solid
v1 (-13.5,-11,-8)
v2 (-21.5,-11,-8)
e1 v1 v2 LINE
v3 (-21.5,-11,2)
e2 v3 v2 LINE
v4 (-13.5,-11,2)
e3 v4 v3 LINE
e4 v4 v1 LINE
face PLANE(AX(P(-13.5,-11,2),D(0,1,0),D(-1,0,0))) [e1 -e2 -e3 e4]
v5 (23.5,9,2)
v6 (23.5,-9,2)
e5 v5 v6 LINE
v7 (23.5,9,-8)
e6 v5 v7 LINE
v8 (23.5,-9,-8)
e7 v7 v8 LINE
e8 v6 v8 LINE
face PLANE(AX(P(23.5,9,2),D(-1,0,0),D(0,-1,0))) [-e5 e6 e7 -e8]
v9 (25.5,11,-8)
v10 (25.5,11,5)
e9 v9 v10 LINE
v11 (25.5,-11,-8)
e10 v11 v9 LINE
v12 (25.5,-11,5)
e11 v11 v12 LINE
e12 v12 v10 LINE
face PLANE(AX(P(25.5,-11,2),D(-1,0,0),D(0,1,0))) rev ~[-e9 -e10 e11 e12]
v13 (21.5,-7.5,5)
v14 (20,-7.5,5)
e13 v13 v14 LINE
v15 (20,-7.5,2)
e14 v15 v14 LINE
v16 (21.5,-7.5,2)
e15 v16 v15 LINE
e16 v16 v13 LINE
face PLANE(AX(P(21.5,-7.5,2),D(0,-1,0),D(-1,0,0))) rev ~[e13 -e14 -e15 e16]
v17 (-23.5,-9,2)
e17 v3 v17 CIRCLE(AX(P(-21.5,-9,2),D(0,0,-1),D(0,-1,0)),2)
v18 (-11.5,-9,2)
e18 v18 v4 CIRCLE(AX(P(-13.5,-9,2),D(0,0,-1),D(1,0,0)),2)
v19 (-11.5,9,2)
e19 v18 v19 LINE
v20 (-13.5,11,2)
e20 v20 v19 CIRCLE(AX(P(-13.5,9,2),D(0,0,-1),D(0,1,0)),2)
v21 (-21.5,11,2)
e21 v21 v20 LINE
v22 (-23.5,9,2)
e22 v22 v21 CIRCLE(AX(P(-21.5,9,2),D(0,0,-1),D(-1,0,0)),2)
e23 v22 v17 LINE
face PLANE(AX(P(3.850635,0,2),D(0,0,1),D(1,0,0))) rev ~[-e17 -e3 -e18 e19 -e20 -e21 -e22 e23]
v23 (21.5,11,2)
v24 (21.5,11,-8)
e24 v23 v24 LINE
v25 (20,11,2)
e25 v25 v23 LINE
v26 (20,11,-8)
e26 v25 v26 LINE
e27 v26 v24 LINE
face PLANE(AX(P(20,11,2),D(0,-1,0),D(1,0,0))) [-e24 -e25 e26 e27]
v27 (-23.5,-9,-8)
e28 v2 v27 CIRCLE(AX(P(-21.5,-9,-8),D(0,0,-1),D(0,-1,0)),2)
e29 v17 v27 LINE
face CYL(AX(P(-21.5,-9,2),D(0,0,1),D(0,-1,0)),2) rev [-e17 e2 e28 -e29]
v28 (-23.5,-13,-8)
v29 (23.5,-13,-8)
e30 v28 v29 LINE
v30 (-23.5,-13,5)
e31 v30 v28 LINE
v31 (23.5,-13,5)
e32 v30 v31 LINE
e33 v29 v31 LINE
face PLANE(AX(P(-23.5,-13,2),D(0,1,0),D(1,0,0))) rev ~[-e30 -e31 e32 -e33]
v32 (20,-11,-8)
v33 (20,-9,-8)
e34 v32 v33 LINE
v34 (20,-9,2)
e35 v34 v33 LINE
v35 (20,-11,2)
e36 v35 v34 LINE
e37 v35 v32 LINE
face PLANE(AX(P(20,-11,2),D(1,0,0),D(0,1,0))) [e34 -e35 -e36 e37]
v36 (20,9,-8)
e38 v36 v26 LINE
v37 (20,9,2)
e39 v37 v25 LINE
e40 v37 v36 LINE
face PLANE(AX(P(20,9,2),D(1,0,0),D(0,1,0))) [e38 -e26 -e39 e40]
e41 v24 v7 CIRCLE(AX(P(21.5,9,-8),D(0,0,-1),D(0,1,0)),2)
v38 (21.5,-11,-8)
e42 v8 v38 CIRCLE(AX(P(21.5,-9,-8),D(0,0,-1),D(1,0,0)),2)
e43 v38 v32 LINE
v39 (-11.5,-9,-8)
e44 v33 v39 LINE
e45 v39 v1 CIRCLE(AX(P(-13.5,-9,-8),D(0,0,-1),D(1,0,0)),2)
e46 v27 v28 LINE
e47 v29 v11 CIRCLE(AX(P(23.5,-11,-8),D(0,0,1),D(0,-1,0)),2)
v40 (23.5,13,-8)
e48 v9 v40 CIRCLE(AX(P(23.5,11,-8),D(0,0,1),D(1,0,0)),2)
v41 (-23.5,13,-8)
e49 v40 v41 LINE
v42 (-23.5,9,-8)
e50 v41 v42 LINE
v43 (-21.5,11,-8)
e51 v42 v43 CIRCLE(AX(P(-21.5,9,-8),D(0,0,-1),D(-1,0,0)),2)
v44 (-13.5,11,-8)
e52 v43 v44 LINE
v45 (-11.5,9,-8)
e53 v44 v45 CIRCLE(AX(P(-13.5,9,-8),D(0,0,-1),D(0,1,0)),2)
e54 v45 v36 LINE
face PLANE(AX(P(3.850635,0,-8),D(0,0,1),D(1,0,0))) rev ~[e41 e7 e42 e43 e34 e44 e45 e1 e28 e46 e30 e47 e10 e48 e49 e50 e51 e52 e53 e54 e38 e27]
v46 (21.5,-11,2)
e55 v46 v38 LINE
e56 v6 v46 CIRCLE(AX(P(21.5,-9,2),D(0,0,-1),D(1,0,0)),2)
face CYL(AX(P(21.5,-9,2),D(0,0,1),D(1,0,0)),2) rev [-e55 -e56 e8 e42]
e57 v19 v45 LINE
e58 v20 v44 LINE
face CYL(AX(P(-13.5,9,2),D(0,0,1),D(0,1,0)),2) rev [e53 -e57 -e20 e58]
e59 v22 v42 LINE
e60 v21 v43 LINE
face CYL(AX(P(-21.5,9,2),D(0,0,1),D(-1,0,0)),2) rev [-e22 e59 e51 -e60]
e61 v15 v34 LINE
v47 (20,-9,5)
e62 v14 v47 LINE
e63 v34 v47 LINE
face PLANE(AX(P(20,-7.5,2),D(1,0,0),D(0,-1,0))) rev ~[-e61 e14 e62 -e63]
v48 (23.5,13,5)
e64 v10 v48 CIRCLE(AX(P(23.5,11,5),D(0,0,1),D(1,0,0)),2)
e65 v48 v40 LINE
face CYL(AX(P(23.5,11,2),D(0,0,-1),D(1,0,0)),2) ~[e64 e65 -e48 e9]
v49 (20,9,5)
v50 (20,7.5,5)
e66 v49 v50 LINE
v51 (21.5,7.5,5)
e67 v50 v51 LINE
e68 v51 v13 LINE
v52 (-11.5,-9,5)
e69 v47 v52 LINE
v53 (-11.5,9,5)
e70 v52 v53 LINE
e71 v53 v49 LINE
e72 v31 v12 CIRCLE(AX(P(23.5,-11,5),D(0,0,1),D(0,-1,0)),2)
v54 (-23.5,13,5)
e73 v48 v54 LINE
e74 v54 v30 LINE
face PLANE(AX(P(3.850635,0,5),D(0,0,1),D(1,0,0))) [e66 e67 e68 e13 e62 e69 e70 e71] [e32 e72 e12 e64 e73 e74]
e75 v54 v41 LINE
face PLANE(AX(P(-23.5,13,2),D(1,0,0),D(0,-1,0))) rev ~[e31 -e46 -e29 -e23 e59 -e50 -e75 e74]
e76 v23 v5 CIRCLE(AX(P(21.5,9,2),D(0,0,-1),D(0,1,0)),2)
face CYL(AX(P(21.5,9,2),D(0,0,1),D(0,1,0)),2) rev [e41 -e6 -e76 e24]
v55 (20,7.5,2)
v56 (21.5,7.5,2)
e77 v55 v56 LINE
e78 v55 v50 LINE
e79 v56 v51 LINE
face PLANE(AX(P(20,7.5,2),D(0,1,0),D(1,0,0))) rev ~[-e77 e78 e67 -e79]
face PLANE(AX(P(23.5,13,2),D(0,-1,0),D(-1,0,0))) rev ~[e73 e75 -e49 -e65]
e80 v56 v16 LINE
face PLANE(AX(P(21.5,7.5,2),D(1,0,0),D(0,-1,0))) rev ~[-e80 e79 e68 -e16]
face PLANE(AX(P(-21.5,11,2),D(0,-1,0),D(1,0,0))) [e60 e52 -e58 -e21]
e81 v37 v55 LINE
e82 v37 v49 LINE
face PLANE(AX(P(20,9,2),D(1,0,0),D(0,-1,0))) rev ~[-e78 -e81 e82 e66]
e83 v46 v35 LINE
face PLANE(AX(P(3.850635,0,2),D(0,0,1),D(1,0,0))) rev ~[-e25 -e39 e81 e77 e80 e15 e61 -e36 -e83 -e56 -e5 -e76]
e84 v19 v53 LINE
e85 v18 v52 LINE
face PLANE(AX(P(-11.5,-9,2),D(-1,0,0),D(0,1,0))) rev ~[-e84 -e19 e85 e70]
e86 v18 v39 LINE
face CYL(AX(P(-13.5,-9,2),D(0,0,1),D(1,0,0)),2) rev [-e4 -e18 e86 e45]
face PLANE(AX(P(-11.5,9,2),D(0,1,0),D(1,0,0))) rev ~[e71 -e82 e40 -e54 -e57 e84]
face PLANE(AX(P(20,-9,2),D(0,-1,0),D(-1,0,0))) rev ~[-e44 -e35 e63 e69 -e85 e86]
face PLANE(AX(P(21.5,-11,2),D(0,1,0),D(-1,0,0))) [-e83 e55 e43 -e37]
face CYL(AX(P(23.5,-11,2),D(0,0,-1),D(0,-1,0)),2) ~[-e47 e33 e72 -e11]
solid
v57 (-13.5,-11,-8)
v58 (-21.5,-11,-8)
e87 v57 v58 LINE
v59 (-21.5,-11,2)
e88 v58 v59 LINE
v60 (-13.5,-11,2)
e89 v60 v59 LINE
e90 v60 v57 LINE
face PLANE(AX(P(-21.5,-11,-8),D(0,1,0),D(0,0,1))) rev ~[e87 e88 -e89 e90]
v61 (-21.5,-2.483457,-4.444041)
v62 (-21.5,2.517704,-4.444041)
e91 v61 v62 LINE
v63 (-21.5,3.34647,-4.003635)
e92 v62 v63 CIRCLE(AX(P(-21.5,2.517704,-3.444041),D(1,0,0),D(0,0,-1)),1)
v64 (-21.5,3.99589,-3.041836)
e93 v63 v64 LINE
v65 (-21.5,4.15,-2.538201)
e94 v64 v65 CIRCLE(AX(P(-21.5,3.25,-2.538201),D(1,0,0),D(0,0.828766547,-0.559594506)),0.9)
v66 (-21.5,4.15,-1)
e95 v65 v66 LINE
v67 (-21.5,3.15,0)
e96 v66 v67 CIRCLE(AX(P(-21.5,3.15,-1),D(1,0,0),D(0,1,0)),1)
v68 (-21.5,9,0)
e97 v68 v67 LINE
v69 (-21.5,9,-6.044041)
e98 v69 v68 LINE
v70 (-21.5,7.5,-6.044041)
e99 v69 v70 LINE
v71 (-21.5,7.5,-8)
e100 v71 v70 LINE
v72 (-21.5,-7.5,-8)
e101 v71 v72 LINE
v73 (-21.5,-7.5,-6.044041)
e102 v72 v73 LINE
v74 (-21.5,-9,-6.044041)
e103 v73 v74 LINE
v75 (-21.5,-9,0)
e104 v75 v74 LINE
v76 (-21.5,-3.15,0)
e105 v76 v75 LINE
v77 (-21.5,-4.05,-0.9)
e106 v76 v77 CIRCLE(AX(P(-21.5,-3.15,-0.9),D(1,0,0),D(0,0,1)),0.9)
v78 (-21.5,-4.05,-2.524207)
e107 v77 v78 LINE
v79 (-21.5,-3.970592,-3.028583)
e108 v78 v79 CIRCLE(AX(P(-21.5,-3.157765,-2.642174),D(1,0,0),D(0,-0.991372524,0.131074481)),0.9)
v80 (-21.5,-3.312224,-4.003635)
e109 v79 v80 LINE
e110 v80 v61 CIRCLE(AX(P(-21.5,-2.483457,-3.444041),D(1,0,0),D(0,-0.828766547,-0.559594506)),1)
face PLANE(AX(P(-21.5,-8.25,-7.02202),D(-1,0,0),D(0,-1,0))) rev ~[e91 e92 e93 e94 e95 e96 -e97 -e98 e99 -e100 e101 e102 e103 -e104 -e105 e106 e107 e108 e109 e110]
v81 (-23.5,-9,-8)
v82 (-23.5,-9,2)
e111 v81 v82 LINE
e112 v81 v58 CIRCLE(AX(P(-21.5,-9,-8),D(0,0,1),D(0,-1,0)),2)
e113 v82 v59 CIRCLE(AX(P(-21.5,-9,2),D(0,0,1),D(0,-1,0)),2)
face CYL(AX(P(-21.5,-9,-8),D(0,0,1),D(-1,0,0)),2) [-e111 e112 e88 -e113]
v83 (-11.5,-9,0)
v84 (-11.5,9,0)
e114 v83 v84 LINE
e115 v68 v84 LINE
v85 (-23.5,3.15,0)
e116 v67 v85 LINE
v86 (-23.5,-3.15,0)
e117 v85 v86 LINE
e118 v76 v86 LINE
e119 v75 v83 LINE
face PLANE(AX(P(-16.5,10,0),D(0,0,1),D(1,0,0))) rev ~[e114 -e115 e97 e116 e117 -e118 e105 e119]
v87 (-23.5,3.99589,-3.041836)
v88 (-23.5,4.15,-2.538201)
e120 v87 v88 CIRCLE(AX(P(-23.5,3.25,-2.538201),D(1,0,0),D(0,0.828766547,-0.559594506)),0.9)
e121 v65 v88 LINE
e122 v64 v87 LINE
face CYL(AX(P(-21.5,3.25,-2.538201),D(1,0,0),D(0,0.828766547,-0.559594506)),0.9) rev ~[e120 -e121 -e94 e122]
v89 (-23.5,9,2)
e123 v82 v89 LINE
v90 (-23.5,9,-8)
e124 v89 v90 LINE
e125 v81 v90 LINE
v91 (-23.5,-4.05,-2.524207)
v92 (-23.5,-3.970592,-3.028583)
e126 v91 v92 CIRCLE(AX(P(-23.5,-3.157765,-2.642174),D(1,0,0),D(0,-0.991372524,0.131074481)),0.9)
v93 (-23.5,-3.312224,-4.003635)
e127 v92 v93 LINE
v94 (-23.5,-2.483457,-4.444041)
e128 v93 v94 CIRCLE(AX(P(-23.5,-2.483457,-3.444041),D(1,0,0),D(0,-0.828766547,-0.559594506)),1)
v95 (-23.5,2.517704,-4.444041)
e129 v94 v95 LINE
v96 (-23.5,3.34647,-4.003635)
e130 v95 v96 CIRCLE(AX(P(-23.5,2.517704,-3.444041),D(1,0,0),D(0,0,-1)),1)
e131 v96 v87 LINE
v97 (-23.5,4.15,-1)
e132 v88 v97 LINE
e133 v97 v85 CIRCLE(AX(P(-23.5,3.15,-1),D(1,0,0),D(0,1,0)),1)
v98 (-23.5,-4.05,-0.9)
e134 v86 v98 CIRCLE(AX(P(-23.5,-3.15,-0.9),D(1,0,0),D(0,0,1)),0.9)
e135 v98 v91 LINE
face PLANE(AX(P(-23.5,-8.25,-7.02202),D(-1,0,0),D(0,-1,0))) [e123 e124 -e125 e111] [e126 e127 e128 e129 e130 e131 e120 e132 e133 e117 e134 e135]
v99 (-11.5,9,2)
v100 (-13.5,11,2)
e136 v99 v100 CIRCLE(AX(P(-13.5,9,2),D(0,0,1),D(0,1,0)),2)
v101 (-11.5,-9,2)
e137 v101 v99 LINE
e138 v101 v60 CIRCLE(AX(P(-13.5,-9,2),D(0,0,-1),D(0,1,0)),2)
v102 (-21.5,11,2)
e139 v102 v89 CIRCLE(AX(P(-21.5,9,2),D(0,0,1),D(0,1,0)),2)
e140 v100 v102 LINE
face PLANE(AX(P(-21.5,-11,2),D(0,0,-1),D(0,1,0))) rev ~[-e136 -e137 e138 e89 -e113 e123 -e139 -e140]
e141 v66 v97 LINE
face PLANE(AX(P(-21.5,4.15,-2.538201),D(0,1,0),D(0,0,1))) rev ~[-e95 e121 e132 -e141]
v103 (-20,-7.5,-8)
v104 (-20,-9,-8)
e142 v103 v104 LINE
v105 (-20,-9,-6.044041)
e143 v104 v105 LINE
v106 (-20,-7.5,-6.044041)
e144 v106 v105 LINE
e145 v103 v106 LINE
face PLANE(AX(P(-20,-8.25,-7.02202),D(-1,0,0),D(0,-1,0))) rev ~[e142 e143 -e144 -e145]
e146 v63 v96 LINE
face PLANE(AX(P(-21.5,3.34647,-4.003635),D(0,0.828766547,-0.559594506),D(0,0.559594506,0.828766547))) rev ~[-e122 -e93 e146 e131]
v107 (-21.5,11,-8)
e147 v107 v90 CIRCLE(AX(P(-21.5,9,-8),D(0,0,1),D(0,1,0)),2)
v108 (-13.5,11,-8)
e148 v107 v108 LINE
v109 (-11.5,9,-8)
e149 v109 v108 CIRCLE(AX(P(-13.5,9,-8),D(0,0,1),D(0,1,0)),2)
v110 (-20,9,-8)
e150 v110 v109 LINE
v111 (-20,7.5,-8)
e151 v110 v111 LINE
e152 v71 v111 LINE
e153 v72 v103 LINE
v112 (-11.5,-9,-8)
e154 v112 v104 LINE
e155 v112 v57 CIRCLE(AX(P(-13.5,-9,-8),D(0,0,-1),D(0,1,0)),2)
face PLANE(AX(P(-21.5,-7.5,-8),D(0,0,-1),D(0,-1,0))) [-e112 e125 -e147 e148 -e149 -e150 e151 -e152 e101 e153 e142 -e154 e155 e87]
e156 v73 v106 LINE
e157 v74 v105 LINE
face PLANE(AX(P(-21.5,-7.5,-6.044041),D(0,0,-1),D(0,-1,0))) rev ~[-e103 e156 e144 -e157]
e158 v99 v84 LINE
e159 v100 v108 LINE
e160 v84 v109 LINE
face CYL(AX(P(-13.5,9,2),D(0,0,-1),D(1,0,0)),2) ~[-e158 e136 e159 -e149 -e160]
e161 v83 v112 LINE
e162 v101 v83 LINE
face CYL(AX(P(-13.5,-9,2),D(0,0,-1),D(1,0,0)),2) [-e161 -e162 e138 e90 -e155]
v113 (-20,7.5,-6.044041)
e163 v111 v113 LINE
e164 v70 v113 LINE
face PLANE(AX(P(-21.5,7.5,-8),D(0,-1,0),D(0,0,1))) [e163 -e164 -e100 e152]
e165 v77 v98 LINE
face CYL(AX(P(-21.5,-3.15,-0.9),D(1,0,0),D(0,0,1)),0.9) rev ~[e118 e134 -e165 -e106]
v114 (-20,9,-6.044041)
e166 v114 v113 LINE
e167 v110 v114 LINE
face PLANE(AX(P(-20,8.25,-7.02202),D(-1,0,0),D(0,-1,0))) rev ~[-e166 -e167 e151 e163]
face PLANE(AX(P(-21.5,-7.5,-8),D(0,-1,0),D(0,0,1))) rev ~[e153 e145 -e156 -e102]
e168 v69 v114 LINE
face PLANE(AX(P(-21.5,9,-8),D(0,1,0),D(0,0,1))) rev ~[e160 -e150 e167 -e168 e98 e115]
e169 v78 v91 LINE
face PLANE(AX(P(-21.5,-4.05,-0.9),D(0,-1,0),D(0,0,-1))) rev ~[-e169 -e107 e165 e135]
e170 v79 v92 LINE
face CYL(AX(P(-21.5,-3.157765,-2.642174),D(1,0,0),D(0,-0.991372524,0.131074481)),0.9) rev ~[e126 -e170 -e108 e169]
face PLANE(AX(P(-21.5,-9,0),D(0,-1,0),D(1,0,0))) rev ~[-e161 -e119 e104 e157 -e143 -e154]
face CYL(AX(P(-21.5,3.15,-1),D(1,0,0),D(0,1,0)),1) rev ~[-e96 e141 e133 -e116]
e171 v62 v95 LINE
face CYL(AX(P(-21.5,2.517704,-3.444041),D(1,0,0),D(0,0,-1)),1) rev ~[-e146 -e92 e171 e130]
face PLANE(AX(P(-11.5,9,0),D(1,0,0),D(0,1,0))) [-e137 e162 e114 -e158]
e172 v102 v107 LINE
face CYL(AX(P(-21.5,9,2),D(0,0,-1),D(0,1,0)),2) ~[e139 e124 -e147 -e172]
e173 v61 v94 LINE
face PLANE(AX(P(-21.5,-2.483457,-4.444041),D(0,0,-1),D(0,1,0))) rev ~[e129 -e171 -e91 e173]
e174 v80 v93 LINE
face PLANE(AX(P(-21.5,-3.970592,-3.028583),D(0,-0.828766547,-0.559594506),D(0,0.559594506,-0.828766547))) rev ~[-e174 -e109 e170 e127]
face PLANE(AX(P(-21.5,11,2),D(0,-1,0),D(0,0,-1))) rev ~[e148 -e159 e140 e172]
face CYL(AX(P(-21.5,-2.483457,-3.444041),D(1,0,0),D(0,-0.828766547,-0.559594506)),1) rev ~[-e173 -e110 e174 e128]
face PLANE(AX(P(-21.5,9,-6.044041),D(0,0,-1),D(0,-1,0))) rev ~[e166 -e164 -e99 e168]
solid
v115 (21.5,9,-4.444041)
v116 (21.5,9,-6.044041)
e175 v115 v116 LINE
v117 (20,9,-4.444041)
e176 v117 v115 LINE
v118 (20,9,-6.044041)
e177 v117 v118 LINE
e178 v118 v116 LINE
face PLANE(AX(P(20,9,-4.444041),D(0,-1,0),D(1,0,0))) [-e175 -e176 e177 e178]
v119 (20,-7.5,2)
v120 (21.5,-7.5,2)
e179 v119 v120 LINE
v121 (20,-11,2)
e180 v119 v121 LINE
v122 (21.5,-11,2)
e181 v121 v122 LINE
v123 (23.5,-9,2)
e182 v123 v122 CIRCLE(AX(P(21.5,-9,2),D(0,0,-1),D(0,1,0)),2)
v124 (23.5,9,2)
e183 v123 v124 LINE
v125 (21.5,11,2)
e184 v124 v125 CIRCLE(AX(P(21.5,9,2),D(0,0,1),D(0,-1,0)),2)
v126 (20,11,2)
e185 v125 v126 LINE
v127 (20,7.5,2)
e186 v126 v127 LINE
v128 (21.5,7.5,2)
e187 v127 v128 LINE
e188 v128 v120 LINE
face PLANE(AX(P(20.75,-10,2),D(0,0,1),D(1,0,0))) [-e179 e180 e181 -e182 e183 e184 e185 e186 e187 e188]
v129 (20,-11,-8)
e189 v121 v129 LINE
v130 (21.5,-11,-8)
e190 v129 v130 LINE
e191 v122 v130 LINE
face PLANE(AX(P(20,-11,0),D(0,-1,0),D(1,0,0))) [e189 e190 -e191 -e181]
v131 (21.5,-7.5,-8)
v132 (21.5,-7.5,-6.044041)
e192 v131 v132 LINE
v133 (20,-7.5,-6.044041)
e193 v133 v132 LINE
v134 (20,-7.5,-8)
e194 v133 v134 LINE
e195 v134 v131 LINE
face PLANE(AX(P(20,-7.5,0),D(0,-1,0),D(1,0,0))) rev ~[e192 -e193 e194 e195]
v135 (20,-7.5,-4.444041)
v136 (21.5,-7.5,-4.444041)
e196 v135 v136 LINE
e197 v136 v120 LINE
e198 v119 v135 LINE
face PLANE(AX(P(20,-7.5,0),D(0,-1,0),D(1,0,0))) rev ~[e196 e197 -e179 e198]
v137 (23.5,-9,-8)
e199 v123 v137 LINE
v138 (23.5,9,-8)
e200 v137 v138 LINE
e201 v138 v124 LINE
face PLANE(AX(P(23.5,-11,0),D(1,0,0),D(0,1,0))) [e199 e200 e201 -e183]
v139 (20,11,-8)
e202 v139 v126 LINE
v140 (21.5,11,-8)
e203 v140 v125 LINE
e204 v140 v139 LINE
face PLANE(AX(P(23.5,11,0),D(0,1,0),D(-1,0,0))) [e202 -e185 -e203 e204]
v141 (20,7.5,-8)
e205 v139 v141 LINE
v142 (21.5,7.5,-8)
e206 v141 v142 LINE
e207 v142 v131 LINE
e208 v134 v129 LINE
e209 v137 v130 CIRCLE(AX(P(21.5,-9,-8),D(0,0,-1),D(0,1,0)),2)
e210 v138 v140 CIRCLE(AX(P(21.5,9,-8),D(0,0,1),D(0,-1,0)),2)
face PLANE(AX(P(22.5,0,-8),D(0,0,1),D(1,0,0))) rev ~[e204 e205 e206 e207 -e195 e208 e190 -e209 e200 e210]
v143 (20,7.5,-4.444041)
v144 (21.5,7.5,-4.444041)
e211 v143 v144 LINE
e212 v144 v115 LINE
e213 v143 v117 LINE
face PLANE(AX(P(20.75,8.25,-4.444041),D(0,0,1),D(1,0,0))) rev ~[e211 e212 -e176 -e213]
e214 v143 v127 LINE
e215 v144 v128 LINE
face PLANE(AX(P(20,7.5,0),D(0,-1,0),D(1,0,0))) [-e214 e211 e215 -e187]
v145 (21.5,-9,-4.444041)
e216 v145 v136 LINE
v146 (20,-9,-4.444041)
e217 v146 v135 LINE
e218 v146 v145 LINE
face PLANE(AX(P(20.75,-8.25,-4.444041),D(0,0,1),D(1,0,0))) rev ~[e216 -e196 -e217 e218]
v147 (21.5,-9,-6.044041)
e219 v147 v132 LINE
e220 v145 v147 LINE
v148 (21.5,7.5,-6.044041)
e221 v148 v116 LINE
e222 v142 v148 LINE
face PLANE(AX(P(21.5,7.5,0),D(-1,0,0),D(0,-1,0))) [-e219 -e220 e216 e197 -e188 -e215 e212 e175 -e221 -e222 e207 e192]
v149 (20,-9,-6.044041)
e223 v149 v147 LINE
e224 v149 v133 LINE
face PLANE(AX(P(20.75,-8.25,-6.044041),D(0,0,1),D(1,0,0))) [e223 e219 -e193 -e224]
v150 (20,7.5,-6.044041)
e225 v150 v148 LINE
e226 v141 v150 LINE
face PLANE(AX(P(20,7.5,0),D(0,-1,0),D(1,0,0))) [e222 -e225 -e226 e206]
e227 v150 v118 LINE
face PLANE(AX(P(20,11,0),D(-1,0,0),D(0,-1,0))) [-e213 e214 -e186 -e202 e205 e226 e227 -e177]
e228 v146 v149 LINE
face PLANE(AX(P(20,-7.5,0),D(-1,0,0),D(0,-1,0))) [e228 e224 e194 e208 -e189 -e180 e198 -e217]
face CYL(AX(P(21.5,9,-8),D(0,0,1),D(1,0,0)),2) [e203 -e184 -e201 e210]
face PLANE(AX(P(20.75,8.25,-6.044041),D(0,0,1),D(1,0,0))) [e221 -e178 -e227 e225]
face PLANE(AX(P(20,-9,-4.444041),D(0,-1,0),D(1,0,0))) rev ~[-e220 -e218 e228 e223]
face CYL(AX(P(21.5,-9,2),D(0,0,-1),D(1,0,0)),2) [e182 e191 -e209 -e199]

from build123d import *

# Parameters (mm, degrees)
F0_W          = 10
F0_H          = 2
F0_H_2        = 18
F1_DEPTH      = 2
F0_W_2        = 1.5
F0_H_3        = 1.5
F2_DEPTH      = 8
F3_W          = 15
F3_H          = 1.9559594506
F4_DEPTH      = 2
F3_W_2        = 1.5
F5_DEPTH      = 2
F5_DEPTH_BACK = 1.5
F6_DEPTH      = 8
F7_START      = -4.4440405494
F7_DEPTH      = 1.6
F8_R          = 2
F8_2_R        = 2
F10_DEPTH     = 10
F11_DEPTH     = 3


with BuildPart() as f1:
    # F0 (on Top) → F1 (new body)
    with BuildSketch(Plane.XY):
        with Locations((-16.5, 10)):
            Rectangle(F0_W, F0_H)
        with Locations((-16.5, -10)):
            Rectangle(F0_W, F0_H)
        with Locations((-16.5, 0)):
            Rectangle(F0_W, F0_H_2)
    extrude(amount=F1_DEPTH)

    # F0 (on Top) → F2 (join)
    with BuildSketch(Plane.XY):
        with Locations((-16.5, 10)):
            Rectangle(F0_W, F0_H)
        with Locations((-16.5, -10)):
            Rectangle(F0_W, F0_H)
    extrude(amount=-F2_DEPTH)

    # F3 (on face) → F4 (join)
    with BuildSketch(Plane(origin=(-21.5, 0, 0), x_dir=(0, -1, 0), z_dir=(-1, 0, 0))):
        with BuildLine():
            Line((-9, 0), (-9, -6.0440405494))
            Line((-9, -6.0440405494), (-7.5, -6.0440405494))
            Line((-7.5, -6.0440405494), (7.5, -6.0440405494))
            Line((7.5, -6.0440405494), (9, -6.0440405494))
            Line((9, -6.0440405494), (9, 0))
            Line((9, 0), (3.15, 0))
            ThreePointArc((3.15, 0), (3.7863961031, -0.2636038969), (4.05, -0.9))
            Line((4.05, -0.9), (4.05, -2.5242070224))
            ThreePointArc((4.05, -2.5242070224), (4.0468138033, -2.7821445636), (3.9705917564, -3.0285834538))
            Line((3.9705917564, -3.0285834538), (3.312223581, -4.0036350553))
            ThreePointArc((3.312223581, -4.0036350553), (2.9527146896, -4.3271018457), (2.4834570343, -4.4440405494))
            Line((2.4834570343, -4.4440405494), (-2.517703725, -4.4440405494))
            ThreePointArc((-2.517703725, -4.4440405494), (-2.9869613803, -4.3271018457), (-3.3464702717, -4.0036350553))
            Line((-3.3464702717, -4.0036350553), (-3.995889892, -3.0418363771))
            ThreePointArc((-3.995889892, -3.0418363771), (-4.1106105109, -2.8015443463), (-4.15, -2.5382013218))
            Line((-4.15, -2.5382013218), (-4.15, -1))
            ThreePointArc((-4.15, -1), (-3.8571067812, -0.2928932188), (-3.15, 0))
            Line((-3.15, 0), (-9, 0))
        make_face()
        Polygon((-9, -8), (-9, -6.0440405494), (-9, 0), (-3.15, 0), (3.15, 0), (9, 0), (9, -6.0440405494), (9, -8), (11, -8), (11, 2), (-11, 2), (-11, -8), align=None)
        with Locations((0, -7.0220202747)):
            Rectangle(F3_W, F3_H)
    extrude(amount=F4_DEPTH)

    # F3 (on face) → F5 (join, two sides)
    with BuildSketch(Plane(origin=(-21.5, 0, 0), x_dir=(0, -1, 0), z_dir=(-1, 0, 0))) as f5_sk:
        with Locations((8.25, -7.0220202747)):
            Rectangle(F3_W_2, F3_H)
        with Locations((-8.25, -7.0220202747)):
            Rectangle(F3_W_2, F3_H)
    extrude(amount=F5_DEPTH)
    extrude(f5_sk.sketch, amount=-F5_DEPTH_BACK)

    # F8
    f8_edges = [f1.edges().sort_by_distance(p)[0] for p in [
        (-23.5, 11, -3),
        (-23.5, -11, -3),
        (-11.5, 11, -3),
        (-11.5, -11, -3),
    ]]
    fillet(f8_edges, radius=F8_R)


with BuildPart() as f1b:
    # F0 (on Top) → F1, piece 2 (new body)
    with BuildSketch(Plane.XY):
        with Locations((20.75, -10)):
            Rectangle(F0_W_2, F0_H)
        with Locations((20.75, 8.25)):
            Rectangle(F0_W_2, F0_H_3)
        with Locations((20.75, -8.25)):
            Rectangle(F0_W_2, F0_H_3)
        Polygon((21.5, -7.5), (21.5, -9), (21.5, -11), (23.5, -11), (23.5, 11), (21.5, 11), (21.5, 9), (21.5, 7.5), align=None)
        with Locations((20.75, 10)):
            Rectangle(F0_W_2, F0_H)
    extrude(amount=F1_DEPTH)

    # F0 (on Top) → F6 (join, through all)
    with BuildSketch(Plane.XY):
        Polygon((21.5, -7.5), (21.5, -9), (21.5, -11), (23.5, -11), (23.5, 11), (21.5, 11), (21.5, 9), (21.5, 7.5), align=None)
        with Locations((20.75, -10)):
            Rectangle(F0_W_2, F0_H)
        with Locations((20.75, 10)):
            Rectangle(F0_W_2, F0_H)
        with Locations((20.75, -8.25)):
            Rectangle(F0_W_2, F0_H_3)
        with Locations((20.75, 8.25)):
            Rectangle(F0_W_2, F0_H_3)
    extrude(amount=-F6_DEPTH)

    # F0 (on Top) → F7 (cut)
    with BuildSketch(Plane.XY.offset(F7_START)):
        with Locations((20.75, -8.25)):
            Rectangle(F0_W_2, F0_H_3)
        with Locations((20.75, 8.25)):
            Rectangle(F0_W_2, F0_H_3)
    extrude(amount=-F7_DEPTH, mode=Mode.SUBTRACT)

    # F8#2
    f8_2_edges = [f1b.edges().sort_by_distance(p)[0] for p in [
        (23.5, 11, -3),
        (23.5, -11, -3),
    ]]
    fillet(f8_2_edges, radius=F8_2_R)


with BuildPart() as f10:
    # F9 (on face) → F10 (new body, through all)
    with BuildSketch(Plane.XY.offset(2)):
        with BuildLine():
            ThreePointArc((-21.5, -11), (-22.9142135624, -10.4142135624), (-23.5, -9))
            Line((-23.5, -9), (-23.5, -13))
            Line((-23.5, -13), (23.5, -13))
            ThreePointArc((23.5, -13), (24.9142135624, -12.4142135624), (25.5, -11))
            Line((25.5, -11), (25.5, 0))
            Line((25.5, 0), (25.5, 11))
            ThreePointArc((25.5, 11), (24.9142135624, 12.4142135624), (23.5, 13))
            Line((23.5, 13), (-23.5, 13))
            Line((-23.5, 13), (-23.5, 9))
            ThreePointArc((-23.5, 9), (-22.9142135624, 10.4142135624), (-21.5, 11))
            Line((-21.5, 11), (-13.5, 11))
            Line((-13.5, 11), (20, 11))
            Line((20, 11), (21.5, 11))
            ThreePointArc((21.5, 11), (22.9142135624, 10.4142135624), (23.5, 9))
            Line((23.5, 9), (23.5, 0))
            Line((23.5, 0), (23.5, -9))
            ThreePointArc((23.5, -9), (22.9142135624, -10.4142135624), (21.5, -11))
            Line((21.5, -11), (20, -11))
            Line((20, -11), (-13.5, -11))
            Line((-13.5, -11), (-21.5, -11))
        make_face()
        with BuildLine():
            ThreePointArc((-11.5, -9), (-12.0857864376, -10.4142135624), (-13.5, -11))
            Line((-13.5, -11), (20, -11))
            Line((20, -11), (20, -9))
            Line((20, -9), (-11.5, -9))
        make_face()
        with BuildLine():
            Line((20, 11), (-13.5, 11))
            ThreePointArc((-13.5, 11), (-12.0857864376, 10.4142135624), (-11.5, 9))
            Line((-11.5, 9), (20, 9))
            Line((20, 9), (20, 11))
        make_face()
    extrude(amount=-F10_DEPTH)

    # F9 (on face) → F11 (join)
    with BuildSketch(Plane.XY.offset(2)):
        with BuildLine():
            ThreePointArc((-21.5, -11), (-22.9142135624, -10.4142135624), (-23.5, -9))
            Line((-23.5, -9), (-23.5, -13))
            Line((-23.5, -13), (23.5, -13))
            ThreePointArc((23.5, -13), (24.9142135624, -12.4142135624), (25.5, -11))
            Line((25.5, -11), (25.5, 0))
            Line((25.5, 0), (25.5, 11))
            ThreePointArc((25.5, 11), (24.9142135624, 12.4142135624), (23.5, 13))
            Line((23.5, 13), (-23.5, 13))
            Line((-23.5, 13), (-23.5, 9))
            ThreePointArc((-23.5, 9), (-22.9142135624, 10.4142135624), (-21.5, 11))
            Line((-21.5, 11), (-13.5, 11))
            Line((-13.5, 11), (20, 11))
            Line((20, 11), (21.5, 11))
            ThreePointArc((21.5, 11), (22.9142135624, 10.4142135624), (23.5, 9))
            Line((23.5, 9), (23.5, 0))
            Line((23.5, 0), (23.5, -9))
            ThreePointArc((23.5, -9), (22.9142135624, -10.4142135624), (21.5, -11))
            Line((21.5, -11), (20, -11))
            Line((20, -11), (-13.5, -11))
            Line((-13.5, -11), (-21.5, -11))
        make_face()
        with BuildLine():
            Line((20, -9), (20, -11))
            Line((20, -11), (21.5, -11))
            ThreePointArc((21.5, -11), (22.9142135624, -10.4142135624), (23.5, -9))
            Line((23.5, -9), (23.5, 0))
            Line((23.5, 0), (23.5, 9))
            ThreePointArc((23.5, 9), (22.9142135624, 10.4142135624), (21.5, 11))
            Line((21.5, 11), (20, 11))
            Line((20, 11), (20, 9))
            Line((20, 9), (20, 7.5))
            Line((20, 7.5), (21.5, 7.5))
            Line((21.5, 7.5), (21.5, -7.5))
            Line((21.5, -7.5), (20, -7.5))
            Line((20, -7.5), (20, -9))
        make_face()
        with BuildLine():
            Line((-23.5, 9), (-23.5, -9))
            ThreePointArc((-23.5, -9), (-22.9142135624, -10.4142135624), (-21.5, -11))
            Line((-21.5, -11), (-13.5, -11))
            ThreePointArc((-13.5, -11), (-12.0857864376, -10.4142135624), (-11.5, -9))
            Line((-11.5, -9), (-11.5, 9))
            ThreePointArc((-11.5, 9), (-12.0857864376, 10.4142135624), (-13.5, 11))
            Line((-13.5, 11), (-21.5, 11))
            ThreePointArc((-21.5, 11), (-22.9142135624, 10.4142135624), (-23.5, 9))
        make_face()
        with BuildLine():
            Line((20, 11), (-13.5, 11))
            ThreePointArc((-13.5, 11), (-12.0857864376, 10.4142135624), (-11.5, 9))
            Line((-11.5, 9), (20, 9))
            Line((20, 9), (20, 11))
        make_face()
        with BuildLine():
            ThreePointArc((-11.5, -9), (-12.0857864376, -10.4142135624), (-13.5, -11))
            Line((-13.5, -11), (20, -11))
            Line((20, -11), (20, -9))
            Line((20, -9), (-11.5, -9))
        make_face()
    extrude(amount=F11_DEPTH)


solid = Compound([f1.part, f1b.part, f10.part])
